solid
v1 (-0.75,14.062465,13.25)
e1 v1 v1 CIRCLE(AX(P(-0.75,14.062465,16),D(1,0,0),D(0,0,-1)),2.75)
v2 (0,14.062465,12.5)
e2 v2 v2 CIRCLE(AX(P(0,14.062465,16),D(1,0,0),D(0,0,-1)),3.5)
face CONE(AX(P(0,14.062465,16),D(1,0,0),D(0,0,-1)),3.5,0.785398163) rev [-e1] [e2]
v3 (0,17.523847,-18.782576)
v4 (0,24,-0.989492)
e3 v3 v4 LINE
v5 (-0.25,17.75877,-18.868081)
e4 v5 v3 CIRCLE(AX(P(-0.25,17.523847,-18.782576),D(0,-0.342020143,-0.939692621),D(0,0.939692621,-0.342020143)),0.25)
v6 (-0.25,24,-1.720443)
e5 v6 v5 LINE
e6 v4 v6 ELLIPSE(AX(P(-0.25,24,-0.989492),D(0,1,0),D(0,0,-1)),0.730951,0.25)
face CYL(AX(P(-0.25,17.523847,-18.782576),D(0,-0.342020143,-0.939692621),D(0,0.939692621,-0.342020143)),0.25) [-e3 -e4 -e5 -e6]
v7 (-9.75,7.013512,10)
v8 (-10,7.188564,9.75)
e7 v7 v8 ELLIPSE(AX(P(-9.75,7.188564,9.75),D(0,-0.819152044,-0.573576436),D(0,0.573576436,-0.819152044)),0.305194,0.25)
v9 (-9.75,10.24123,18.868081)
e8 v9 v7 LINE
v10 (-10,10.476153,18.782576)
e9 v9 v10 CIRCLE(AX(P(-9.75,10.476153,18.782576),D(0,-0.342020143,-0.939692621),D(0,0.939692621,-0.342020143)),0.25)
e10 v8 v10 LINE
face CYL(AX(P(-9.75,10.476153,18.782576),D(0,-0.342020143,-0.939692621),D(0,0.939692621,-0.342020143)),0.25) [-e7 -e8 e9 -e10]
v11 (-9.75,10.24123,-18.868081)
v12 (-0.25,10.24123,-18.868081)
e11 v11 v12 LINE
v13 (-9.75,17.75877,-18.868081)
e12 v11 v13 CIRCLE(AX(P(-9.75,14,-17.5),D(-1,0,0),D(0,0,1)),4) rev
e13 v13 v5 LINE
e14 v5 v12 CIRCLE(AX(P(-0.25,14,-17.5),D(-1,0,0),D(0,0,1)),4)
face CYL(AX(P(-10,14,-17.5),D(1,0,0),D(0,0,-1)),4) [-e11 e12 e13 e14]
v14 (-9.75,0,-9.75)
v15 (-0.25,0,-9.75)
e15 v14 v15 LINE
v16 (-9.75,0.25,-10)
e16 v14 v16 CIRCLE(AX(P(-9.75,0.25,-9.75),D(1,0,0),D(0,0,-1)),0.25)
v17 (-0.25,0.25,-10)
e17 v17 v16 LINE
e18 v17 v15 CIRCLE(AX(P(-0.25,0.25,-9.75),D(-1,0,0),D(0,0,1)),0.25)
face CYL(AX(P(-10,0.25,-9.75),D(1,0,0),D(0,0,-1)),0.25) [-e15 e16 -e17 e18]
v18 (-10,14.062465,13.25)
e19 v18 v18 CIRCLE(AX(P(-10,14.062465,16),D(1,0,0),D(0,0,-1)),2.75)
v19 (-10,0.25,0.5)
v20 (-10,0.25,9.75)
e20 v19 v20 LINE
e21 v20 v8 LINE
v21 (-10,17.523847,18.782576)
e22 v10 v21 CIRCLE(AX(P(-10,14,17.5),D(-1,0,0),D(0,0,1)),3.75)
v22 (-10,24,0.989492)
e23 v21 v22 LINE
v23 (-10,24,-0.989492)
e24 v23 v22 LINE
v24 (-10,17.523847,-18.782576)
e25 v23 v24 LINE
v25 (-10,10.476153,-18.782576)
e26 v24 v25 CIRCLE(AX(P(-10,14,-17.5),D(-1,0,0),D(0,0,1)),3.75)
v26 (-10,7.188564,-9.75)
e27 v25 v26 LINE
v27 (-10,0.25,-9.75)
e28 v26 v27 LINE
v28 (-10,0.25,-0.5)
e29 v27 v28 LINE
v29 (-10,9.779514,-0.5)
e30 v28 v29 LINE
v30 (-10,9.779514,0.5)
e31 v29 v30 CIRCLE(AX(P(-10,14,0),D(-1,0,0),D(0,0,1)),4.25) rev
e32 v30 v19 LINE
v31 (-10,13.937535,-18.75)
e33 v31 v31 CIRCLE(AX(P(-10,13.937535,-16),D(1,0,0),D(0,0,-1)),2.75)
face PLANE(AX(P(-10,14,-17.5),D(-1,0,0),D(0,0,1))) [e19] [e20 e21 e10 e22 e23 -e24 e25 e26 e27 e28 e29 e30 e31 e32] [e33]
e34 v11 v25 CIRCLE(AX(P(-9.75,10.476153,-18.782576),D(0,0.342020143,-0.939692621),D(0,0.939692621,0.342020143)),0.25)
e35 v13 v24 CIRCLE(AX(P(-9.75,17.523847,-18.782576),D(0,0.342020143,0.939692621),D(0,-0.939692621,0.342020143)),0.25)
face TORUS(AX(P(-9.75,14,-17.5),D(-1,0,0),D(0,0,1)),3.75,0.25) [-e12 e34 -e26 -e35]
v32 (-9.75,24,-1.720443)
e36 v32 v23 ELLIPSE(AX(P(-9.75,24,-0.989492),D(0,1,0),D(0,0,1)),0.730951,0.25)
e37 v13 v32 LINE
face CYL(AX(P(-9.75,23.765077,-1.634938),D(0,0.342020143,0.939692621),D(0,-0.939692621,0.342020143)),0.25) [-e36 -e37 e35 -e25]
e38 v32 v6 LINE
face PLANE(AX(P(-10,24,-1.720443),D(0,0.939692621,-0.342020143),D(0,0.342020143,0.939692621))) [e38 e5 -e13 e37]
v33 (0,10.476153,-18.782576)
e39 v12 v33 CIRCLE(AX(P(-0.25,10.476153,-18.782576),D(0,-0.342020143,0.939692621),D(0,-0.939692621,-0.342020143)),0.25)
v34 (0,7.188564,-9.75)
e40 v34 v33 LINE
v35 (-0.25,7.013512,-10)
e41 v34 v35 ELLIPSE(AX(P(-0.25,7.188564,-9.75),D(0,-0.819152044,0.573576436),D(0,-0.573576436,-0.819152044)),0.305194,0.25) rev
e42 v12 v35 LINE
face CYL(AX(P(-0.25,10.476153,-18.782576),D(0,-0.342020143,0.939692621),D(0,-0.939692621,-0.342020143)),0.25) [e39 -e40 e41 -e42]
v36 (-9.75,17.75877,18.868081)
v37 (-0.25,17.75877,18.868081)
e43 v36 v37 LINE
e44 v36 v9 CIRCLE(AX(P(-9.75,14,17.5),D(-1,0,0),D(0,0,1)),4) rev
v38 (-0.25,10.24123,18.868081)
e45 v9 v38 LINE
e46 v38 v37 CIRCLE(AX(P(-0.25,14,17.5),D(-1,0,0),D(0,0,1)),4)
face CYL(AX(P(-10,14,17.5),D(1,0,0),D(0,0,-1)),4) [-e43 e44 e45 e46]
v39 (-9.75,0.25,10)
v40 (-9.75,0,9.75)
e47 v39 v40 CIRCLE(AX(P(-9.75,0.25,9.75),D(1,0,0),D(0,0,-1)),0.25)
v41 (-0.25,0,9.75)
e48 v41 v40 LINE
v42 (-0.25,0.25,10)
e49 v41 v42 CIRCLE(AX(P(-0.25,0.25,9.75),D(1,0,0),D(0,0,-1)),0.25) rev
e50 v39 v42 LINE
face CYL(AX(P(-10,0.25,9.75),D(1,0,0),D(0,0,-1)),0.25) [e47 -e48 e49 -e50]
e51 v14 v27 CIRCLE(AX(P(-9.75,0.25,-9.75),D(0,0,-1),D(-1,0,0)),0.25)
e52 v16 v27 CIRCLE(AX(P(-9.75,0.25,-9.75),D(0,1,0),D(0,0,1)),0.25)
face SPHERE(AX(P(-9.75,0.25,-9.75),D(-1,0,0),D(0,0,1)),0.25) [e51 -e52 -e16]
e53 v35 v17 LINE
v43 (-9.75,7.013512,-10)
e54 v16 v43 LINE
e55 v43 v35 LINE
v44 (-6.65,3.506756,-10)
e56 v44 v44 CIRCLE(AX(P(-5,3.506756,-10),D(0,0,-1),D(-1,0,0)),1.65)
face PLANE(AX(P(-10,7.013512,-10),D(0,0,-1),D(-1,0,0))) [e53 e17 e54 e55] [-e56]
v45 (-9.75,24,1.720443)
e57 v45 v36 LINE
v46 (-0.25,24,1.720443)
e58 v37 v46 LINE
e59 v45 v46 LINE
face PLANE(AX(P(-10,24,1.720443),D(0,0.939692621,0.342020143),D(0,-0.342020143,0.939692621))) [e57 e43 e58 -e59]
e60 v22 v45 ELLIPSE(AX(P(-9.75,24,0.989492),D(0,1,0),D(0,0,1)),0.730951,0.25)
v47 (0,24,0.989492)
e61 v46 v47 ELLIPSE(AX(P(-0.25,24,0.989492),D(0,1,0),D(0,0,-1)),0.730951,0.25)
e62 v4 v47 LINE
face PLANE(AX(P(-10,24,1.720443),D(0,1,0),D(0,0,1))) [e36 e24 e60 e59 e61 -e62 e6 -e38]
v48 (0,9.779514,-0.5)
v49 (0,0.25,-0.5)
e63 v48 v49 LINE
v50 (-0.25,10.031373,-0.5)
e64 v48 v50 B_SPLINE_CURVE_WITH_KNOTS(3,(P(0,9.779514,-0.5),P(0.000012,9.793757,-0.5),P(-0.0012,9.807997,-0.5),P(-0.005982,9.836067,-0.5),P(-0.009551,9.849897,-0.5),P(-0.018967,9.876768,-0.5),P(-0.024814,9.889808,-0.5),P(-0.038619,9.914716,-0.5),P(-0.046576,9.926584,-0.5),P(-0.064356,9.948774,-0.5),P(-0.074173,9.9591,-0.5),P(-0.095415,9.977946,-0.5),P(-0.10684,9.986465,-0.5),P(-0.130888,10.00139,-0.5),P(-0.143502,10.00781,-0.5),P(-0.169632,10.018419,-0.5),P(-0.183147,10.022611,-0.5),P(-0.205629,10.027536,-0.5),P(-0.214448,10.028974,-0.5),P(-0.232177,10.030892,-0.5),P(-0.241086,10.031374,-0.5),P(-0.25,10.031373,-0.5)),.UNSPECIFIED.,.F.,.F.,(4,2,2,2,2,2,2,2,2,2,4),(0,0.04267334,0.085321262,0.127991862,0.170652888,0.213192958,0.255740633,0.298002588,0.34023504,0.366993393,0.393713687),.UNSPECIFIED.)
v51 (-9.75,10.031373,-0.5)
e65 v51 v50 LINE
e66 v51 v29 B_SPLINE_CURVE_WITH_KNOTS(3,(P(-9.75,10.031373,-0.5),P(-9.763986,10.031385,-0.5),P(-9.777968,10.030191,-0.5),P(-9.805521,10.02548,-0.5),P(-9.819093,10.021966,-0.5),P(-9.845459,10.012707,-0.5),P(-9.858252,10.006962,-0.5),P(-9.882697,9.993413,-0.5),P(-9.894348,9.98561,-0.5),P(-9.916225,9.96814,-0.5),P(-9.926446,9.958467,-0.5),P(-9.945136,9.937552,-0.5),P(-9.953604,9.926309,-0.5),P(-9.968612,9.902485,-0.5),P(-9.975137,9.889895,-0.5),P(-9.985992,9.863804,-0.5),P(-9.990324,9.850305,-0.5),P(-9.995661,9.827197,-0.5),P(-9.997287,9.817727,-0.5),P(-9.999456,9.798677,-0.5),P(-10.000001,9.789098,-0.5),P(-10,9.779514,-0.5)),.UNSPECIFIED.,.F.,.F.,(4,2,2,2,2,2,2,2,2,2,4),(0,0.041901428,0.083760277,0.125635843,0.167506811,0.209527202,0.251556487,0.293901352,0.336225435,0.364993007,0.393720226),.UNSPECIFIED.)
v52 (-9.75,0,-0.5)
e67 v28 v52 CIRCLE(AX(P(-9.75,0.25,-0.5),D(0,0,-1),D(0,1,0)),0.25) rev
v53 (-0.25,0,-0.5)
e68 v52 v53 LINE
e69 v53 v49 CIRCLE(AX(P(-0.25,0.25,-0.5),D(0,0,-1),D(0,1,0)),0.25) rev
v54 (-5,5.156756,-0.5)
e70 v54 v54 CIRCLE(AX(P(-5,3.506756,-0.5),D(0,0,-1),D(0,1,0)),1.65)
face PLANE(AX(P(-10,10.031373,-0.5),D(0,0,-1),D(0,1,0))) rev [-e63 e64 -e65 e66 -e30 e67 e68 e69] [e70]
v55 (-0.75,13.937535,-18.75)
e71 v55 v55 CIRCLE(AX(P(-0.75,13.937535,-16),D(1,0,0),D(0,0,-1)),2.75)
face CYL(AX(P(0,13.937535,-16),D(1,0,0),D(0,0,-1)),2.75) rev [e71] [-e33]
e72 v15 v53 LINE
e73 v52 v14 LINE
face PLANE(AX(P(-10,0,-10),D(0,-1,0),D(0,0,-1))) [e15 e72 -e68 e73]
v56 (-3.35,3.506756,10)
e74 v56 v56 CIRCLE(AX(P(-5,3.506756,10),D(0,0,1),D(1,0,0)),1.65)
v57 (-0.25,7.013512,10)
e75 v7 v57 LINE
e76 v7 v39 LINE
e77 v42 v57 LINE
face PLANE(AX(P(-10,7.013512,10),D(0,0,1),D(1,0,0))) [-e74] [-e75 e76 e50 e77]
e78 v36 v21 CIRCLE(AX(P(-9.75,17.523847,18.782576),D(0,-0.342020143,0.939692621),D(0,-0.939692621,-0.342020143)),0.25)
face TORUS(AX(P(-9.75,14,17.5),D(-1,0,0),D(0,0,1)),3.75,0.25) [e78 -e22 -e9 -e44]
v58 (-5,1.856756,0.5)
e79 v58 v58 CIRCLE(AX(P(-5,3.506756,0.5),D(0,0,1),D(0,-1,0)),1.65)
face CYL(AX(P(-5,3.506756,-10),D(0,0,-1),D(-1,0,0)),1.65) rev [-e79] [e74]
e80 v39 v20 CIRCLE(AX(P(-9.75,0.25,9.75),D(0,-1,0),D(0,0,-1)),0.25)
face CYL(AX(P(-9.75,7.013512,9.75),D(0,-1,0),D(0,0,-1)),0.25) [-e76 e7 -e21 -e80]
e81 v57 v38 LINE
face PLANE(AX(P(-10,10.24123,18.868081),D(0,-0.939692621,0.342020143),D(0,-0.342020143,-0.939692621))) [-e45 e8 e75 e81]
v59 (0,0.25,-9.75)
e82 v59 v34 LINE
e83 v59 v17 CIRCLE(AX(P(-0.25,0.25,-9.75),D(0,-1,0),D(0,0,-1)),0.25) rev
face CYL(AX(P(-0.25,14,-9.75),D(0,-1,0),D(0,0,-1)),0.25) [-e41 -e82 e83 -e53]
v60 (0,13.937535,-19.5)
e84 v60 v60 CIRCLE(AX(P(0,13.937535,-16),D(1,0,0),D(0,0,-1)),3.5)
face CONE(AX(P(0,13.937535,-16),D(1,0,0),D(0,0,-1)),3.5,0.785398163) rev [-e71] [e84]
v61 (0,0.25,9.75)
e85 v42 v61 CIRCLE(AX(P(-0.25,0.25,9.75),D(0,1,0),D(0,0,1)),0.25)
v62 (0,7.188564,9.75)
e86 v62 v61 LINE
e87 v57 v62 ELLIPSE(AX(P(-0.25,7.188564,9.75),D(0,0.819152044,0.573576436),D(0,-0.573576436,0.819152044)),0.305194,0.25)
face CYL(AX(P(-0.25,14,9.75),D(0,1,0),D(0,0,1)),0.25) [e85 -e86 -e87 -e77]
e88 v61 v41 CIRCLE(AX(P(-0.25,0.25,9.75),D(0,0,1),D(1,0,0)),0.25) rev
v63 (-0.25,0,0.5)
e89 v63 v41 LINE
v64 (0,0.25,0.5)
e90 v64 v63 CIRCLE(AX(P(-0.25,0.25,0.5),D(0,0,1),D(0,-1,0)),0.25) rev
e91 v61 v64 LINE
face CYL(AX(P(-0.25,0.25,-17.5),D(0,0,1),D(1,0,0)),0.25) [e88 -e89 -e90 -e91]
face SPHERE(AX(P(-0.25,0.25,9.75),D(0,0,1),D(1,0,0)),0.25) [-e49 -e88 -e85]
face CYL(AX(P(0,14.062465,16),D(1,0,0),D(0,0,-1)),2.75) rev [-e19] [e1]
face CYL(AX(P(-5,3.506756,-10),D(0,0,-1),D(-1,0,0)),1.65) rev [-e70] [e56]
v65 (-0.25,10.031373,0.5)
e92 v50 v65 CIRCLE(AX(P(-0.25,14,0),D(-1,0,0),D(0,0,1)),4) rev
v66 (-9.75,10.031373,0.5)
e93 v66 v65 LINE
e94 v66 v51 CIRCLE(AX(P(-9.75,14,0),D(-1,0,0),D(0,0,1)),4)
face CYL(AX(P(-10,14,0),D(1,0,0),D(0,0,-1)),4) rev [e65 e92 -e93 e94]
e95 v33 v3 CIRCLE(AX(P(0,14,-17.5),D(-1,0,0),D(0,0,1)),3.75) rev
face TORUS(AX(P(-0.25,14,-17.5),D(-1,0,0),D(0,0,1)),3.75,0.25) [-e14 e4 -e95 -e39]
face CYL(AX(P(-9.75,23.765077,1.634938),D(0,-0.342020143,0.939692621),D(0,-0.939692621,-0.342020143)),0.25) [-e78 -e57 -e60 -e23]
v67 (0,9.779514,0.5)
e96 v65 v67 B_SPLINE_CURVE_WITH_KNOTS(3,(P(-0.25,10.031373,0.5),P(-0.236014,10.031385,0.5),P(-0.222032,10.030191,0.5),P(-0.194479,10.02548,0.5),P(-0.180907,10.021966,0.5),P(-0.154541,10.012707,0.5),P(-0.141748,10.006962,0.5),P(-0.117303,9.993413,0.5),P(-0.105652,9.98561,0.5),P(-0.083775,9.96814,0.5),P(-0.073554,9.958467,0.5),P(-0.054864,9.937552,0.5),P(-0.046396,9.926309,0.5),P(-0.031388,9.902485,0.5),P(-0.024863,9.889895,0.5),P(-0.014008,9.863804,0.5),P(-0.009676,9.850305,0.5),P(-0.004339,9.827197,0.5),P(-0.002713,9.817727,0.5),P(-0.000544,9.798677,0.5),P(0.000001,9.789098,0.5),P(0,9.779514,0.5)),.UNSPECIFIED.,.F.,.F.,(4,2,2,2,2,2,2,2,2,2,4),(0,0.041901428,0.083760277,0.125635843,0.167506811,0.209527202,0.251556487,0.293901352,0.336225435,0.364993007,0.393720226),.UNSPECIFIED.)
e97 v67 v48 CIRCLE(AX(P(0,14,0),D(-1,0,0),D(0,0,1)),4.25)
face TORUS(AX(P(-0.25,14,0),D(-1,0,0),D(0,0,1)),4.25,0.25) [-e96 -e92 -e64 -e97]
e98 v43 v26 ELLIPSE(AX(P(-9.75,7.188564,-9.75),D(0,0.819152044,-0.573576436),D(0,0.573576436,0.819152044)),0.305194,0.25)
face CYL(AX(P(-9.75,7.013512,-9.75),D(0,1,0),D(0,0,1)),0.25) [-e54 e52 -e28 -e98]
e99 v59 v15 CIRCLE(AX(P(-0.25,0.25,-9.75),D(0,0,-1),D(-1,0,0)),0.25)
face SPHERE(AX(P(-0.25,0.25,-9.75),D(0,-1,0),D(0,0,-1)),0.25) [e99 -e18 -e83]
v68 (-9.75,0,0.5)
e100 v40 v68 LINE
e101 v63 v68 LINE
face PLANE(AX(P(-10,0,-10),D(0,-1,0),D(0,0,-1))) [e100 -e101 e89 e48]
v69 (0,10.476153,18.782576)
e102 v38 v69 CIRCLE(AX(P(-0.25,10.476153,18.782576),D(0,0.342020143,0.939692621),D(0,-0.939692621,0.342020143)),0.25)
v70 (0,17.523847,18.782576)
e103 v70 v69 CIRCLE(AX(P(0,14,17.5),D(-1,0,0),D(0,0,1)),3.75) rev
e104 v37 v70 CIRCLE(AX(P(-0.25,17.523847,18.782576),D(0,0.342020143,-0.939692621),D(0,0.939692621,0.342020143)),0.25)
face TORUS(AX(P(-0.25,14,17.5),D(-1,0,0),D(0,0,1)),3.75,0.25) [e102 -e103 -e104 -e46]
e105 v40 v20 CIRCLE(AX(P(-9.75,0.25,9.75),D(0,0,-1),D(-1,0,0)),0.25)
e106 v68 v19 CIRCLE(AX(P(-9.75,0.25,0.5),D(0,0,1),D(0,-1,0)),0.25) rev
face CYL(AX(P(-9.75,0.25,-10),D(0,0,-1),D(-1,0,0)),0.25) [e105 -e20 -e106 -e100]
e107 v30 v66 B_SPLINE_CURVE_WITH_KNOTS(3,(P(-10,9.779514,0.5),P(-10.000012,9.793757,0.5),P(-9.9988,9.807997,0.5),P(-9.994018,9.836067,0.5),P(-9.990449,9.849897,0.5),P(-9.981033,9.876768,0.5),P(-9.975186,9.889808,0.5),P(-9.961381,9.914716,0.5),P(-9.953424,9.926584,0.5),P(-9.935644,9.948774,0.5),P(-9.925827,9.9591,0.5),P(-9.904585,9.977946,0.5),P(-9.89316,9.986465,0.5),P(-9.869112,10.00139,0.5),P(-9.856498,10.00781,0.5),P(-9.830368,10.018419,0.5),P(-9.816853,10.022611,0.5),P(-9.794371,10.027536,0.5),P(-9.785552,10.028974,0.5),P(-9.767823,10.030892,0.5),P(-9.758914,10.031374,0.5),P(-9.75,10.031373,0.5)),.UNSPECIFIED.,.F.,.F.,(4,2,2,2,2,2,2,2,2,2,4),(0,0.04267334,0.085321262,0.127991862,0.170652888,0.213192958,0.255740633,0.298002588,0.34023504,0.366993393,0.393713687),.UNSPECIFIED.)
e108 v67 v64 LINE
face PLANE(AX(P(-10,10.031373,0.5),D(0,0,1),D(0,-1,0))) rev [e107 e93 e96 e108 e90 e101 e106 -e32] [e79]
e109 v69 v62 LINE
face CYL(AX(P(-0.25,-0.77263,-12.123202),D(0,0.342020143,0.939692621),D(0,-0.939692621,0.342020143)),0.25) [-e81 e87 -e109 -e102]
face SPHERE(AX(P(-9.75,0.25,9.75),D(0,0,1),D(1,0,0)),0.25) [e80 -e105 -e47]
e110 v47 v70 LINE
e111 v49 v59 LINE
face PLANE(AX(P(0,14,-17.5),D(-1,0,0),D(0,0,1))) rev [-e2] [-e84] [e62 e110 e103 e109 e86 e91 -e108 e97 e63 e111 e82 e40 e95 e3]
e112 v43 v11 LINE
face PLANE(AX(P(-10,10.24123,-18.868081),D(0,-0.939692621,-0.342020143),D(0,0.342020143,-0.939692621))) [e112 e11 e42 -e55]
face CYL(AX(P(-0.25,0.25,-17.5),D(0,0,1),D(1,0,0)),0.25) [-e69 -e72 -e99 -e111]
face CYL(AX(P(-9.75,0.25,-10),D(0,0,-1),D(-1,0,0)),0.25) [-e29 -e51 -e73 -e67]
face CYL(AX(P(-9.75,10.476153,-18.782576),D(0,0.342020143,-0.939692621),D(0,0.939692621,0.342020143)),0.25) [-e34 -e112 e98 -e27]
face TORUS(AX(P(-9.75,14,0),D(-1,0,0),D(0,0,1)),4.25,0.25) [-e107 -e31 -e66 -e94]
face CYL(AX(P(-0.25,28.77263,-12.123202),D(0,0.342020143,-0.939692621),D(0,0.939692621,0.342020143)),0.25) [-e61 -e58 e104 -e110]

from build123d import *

# Parameters (mm, degrees)
RESSALTO_EXTRUS_O1_DEPTH                             = 10
CORTE_EXTRUS_O1_DEPTH                                = 10
ESCAREADO_PARA_PARAFUSO_DE_M_QUINA_COM_C_D           = 5.5
ESCAREADO_PARA_PARAFUSO_DE_M_QUINA_COM_C_CSINK_D     = 7
ESCAREADO_PARA_PARAFUSO_DE_M_QUINA_COM_C_CSINK_ANGLE = 90
BROCA_DE_ROSQUEAR_PARA_TARRAXA_DE_M4X0_7_D           = 3.3
FILETE1_R                                            = 0.25
FILETE2_R                                            = 0.25
FILETE3_R                                            = 0.25
FILETE4_R                                            = 0.25
FILETE5_R                                            = 0.25
FILETE6_R                                            = 0.25
FILETE7_R                                            = 0.25


with BuildPart() as part:
    # Esboço1 → Ressalto-extrusão1 (new body)
    with BuildSketch(Plane(origin=(0, 0, 0), x_dir=(0, 0, -1), z_dir=(1, 0, 0))):
        with BuildLine():
            Line((1.720443406, 24), (18.868080573, 17.758770483))
            ThreePointArc((18.868080573, 17.758770483), (21.5, 14), (18.868080573, 10.241229517))
            Line((18.868080573, 10.241229517), (10, 7.013512153))
            Line((10, 7.013512153), (10, 0))
            Line((10, 0), (-10, 0))
            Line((-10, 0), (-10, 7.013512153))
            Line((-10, 7.013512153), (-18.868080573, 10.241229517))
            ThreePointArc((-18.868080573, 10.241229517), (-21.5, 14), (-18.868080573, 17.758770483))
            Line((-18.868080573, 17.758770483), (-1.720443406, 24))
            Line((-1.720443406, 24), (1.720443406, 24))
        make_face()
    extrude(amount=-RESSALTO_EXTRUS_O1_DEPTH)

    # Esboço2 → Corte-extrusão1 (cut)
    with BuildSketch(Plane(origin=(0, 0, 0), x_dir=(0, 0, -1), z_dir=(1, 0, 0))):
        with BuildLine():
            Line((-0.5, 10.031373033), (-0.5, -0.626033642))
            Line((-0.5, -0.626033642), (0.5, -0.626033642))
            Line((0.5, -0.626033642), (0.5, 10.031373033))
            ThreePointArc((0.5, 10.031373033), (0, 18), (-0.5, 10.031373033))
        make_face()
    extrude(amount=-CORTE_EXTRUS_O1_DEPTH, mode=Mode.SUBTRACT)

    # Escareado para parafuso de máquina com cabeça chata de M51 (through all)
    with Locations(Plane(origin=(0, 0, 0), x_dir=(0, 0, -1), z_dir=(1, 0, 0))):
        with Locations((-16, 14.062464808), (16, 13.937535192)):
            CounterSinkHole(ESCAREADO_PARA_PARAFUSO_DE_M_QUINA_COM_C_D / 2, ESCAREADO_PARA_PARAFUSO_DE_M_QUINA_COM_C_CSINK_D / 2, counter_sink_angle=ESCAREADO_PARA_PARAFUSO_DE_M_QUINA_COM_C_CSINK_ANGLE)

    # Broca de rosquear para tarraxa de M4x0.71 (through all)
    with Locations(Plane(origin=(0, 0, -10), x_dir=(-1, 0, 0), z_dir=(0, 0, -1))):
        with Locations((5, 3.506756077)):
            Hole(BROCA_DE_ROSQUEAR_PARA_TARRAXA_DE_M4X0_7_D / 2)

    # Filete1
    filete1_edges = [part.edges().sort_by_distance(p)[0] for p in [
        (0, 20.879385242, -10.29426199),
        (0, 14, -21.5),
        (0, 8.627370835, -14.434040287),
    ]]
    fillet(filete1_edges, radius=FILETE1_R)

    # Filete2
    filete2_edges = [part.edges().sort_by_distance(p)[0] for p in [
        (0, 3.639778298, -10),
    ]]
    fillet(filete2_edges, radius=FILETE2_R)

    # Filete3
    filete3_edges = [part.edges().sort_by_distance(p)[0] for p in [
        (-5.125, 0, -10),
        (0, 0, -5.125),
        (-0.073223305, 0, -9.926776695),
    ]]
    fillet(filete3_edges, radius=FILETE3_R)

    # Filete4
    filete4_edges = [part.edges().sort_by_distance(p)[0] for p in [
        (0, 0, 5.25),
        (-5, 0, 10),
        (-10, 0, 5.25),
    ]]
    fillet(filete4_edges, radius=FILETE4_R)

    # Filete5
    # the kernel refuses this fillet: 0.25 mm, written as the material it takes off along each edge
    with BuildSketch(Plane(origin=(-0.25, 0.25, 9.75), x_dir=(1, 0, 0), z_dir=(0, 0, 1))) as filete5_piece_1_section:
        Polygon((0, 0), (FILETE5_R * 1.02, 0), (FILETE5_R * 1.02, -FILETE5_R * 1.02), (0, -FILETE5_R * 1.02), align=None)
    filete5_piece_1 = extrude(amount=FILETE5_R * 1.02, mode=Mode.PRIVATE)
    filete5_piece_1 = filete5_piece_1 - Plane(origin=(-0.25, 0.25, 9.75), x_dir=(-0.7071067811865475, 0.7071067811865475, 0), z_dir=(0, 0, 1)) * Sphere(FILETE5_R, mode=Mode.PRIVATE)
    add(filete5_piece_1, mode=Mode.SUBTRACT)
    with BuildSketch(Plane(origin=(0, 0.25, 10), x_dir=(-1, 0, 0), z_dir=(0, 1, 0))) as filete5_piece_2_section:
        with BuildLine():
            CenterArc((FILETE5_R, -FILETE5_R), FILETE5_R, 90, 90)
            Line((0, -FILETE5_R), (-FILETE5_R * 0.02, -FILETE5_R))
            Line((-FILETE5_R * 0.02, -FILETE5_R), (-FILETE5_R * 0.02, FILETE5_R * 0.02))
            Line((-FILETE5_R * 0.02, FILETE5_R * 0.02), (FILETE5_R, FILETE5_R * 0.02))
            Line((FILETE5_R, FILETE5_R * 0.02), (FILETE5_R, 0))
        make_face()
    filete5_piece_2 = extrude(amount=8.263512153, mode=Mode.PRIVATE)
    filete5_piece_2 = split(filete5_piece_2, bisect_by=Plane(origin=(-0.056691407, 6.598580187, 8.859983793), z_dir=(0, -0.9396926207859096, 0.3420201433256659)), keep=Keep.TOP, mode=Mode.PRIVATE)
    add(filete5_piece_2, mode=Mode.SUBTRACT)
    with BuildSketch(Plane(origin=(0, 6.500481938, 8.590461069), x_dir=(-1, 0, 0), z_dir=(0, 0.3420201433256658, 0.9396926207859094))) as filete5_piece_3_section:
        with BuildLine():
            CenterArc((FILETE5_R, -FILETE5_R), FILETE5_R, 90, 90)
            Line((0, -FILETE5_R), (-FILETE5_R * 0.02, -FILETE5_R))
            Line((-FILETE5_R * 0.02, -FILETE5_R), (-FILETE5_R * 0.02, FILETE5_R * 0.02))
            Line((-FILETE5_R * 0.02, FILETE5_R * 0.02), (FILETE5_R, FILETE5_R * 0.02))
            Line((FILETE5_R, FILETE5_R * 0.02), (FILETE5_R, 0))
        make_face()
    filete5_piece_3 = extrude(amount=10.937214231, mode=Mode.PRIVATE)
    filete5_piece_3 = split(filete5_piece_3, bisect_by=Plane(origin=(-0.056665107, 8.68396665, 10), z_dir=(0, 0, 1)), keep=Keep.TOP, mode=Mode.PRIVATE)
    add(filete5_piece_3, mode=Mode.SUBTRACT)
    with BuildSketch(Plane(origin=(0, 14, 17.5), x_dir=(0, -0.9396926207859096, 0.3420201433256654), z_dir=(0, -0.3420201433256654, -0.9396926207859096))) as filete5_piece_4:
        with BuildLine():
            CenterArc((4 - FILETE5_R, FILETE5_R), FILETE5_R, 270, 90)
            Line((4 - FILETE5_R, 0), (4 - FILETE5_R, -FILETE5_R * 0.02))
            Line((4 - FILETE5_R, -FILETE5_R * 0.02), (4 + FILETE5_R * 0.02, -FILETE5_R * 0.02))
            Line((4 + FILETE5_R * 0.02, -FILETE5_R * 0.02), (4 + FILETE5_R * 0.02, FILETE5_R))
            Line((4 + FILETE5_R * 0.02, FILETE5_R), (4, FILETE5_R))
        make_face()
    revolve(axis=Axis((0, 14, 17.5), (-1, 0, 0)), revolution_arc=140, mode=Mode.SUBTRACT)
    with BuildSketch(Plane(origin=(0, 17.758770483, 18.868080573), x_dir=(-1, 0, 0), z_dir=(0, 0.342020143325666, -0.9396926207859094))) as filete5_piece_5:
        with BuildLine():
            CenterArc((FILETE5_R, -FILETE5_R), FILETE5_R, 90, 90)
            Line((0, -FILETE5_R), (-FILETE5_R * 0.02, -FILETE5_R))
            Line((-FILETE5_R * 0.02, -FILETE5_R), (-FILETE5_R * 0.02, FILETE5_R * 0.02))
            Line((-FILETE5_R * 0.02, FILETE5_R * 0.02), (FILETE5_R, FILETE5_R * 0.02))
            Line((FILETE5_R, FILETE5_R * 0.02), (FILETE5_R, 0))
        make_face()
    extrude(amount=19.748134324, mode=Mode.SUBTRACT)
    with BuildSketch(Plane(origin=(0, 0.25, 10), x_dir=(-1, 0, 0), z_dir=(0, 1, 0))) as filete5_piece_6a_section:
        with BuildLine():
            CenterArc((FILETE5_R, -FILETE5_R), FILETE5_R, 90, 90)
            Line((0, -FILETE5_R), (-FILETE5_R * 0.02, -FILETE5_R))
            Line((-FILETE5_R * 0.02, -FILETE5_R), (-FILETE5_R * 0.02, FILETE5_R * 0.02))
            Line((-FILETE5_R * 0.02, FILETE5_R * 0.02), (FILETE5_R, FILETE5_R * 0.02))
            Line((FILETE5_R, FILETE5_R * 0.02), (FILETE5_R, 0))
        make_face()
    filete5_piece_6a = extrude(amount=8.263512153, mode=Mode.PRIVATE)
    filete5_piece_6a = split(filete5_piece_6a, bisect_by=Plane(origin=(-0.056188027, 7.08161184, 10.187102353), z_dir=(0, 0.9396926207859096, -0.3420201433256659)), keep=Keep.TOP, mode=Mode.PRIVATE)
    with BuildSketch(Plane(origin=(0, 6.500481938, 8.590461069), x_dir=(-1, 0, 0), z_dir=(0, 0.3420201433256658, 0.9396926207859094))) as filete5_piece_6b_section:
        with BuildLine():
            CenterArc((FILETE5_R, -FILETE5_R), FILETE5_R, 90, 90)
            Line((0, -FILETE5_R), (-FILETE5_R * 0.02, -FILETE5_R))
            Line((-FILETE5_R * 0.02, -FILETE5_R), (-FILETE5_R * 0.02, FILETE5_R * 0.02))
            Line((-FILETE5_R * 0.02, FILETE5_R * 0.02), (FILETE5_R, FILETE5_R * 0.02))
            Line((FILETE5_R, FILETE5_R * 0.02), (FILETE5_R, 0))
        make_face()
    filete5_piece_6b = extrude(amount=10.937214231, mode=Mode.PRIVATE)
    filete5_piece_6b = split(filete5_piece_6b, bisect_by=Plane(origin=(-0.056188027, 6.814401988, 10), z_dir=(0, 0, -1)), keep=Keep.TOP, mode=Mode.PRIVATE)
    filete5_piece_6 = filete5_piece_6a & filete5_piece_6b
    add(filete5_piece_6, mode=Mode.SUBTRACT)

    # Filete6
    # the kernel refuses this fillet: 0.25 mm, written as the material it takes off along each edge
    with BuildSketch(Plane(origin=(-9.75, 0.25, 9.75), x_dir=(0, 0, 1), z_dir=(-1, 0, 0))) as filete6_piece_1_section:
        Polygon((0, 0), (FILETE6_R * 1.02, 0), (FILETE6_R * 1.02, -FILETE6_R * 1.02), (0, -FILETE6_R * 1.02), align=None)
    filete6_piece_1 = extrude(amount=FILETE6_R * 1.02, mode=Mode.PRIVATE)
    filete6_piece_1 = filete6_piece_1 - Plane(origin=(-9.75, 0.25, 9.75), x_dir=(0, 0.7071067811865475, -0.7071067811865475), z_dir=(-1, 0, 0)) * Sphere(FILETE6_R, mode=Mode.PRIVATE)
    add(filete6_piece_1, mode=Mode.SUBTRACT)
    with BuildSketch(Plane(origin=(-10, 17.758770483, 18.868080573), x_dir=(0, -0.9396926207859094, -0.34202014332566594), z_dir=(0, 0.342020143325666, -0.9396926207859094)), Plane(origin=(-10, 24.513030215, -0.310904475), x_dir=(0, -0.9396926207859094, 0.342020143325666), z_dir=(0, -0.342020143325666, -0.9396926207859094))) as filete6_piece_2:
        with BuildLine():
            CenterArc((FILETE6_R, -FILETE6_R), FILETE6_R, 90, 90)
            Line((0, -FILETE6_R), (-FILETE6_R * 0.02, -FILETE6_R))
            Line((-FILETE6_R * 0.02, -FILETE6_R), (-FILETE6_R * 0.02, FILETE6_R * 0.02))
            Line((-FILETE6_R * 0.02, FILETE6_R * 0.02), (FILETE6_R, FILETE6_R * 0.02))
            Line((FILETE6_R, FILETE6_R * 0.02), (FILETE6_R, 0))
        make_face()
    extrude(amount=19.748134324, mode=Mode.SUBTRACT)
    with BuildSketch(Plane(origin=(-10, 14, 17.5), x_dir=(0, -0.9396926207859096, 0.3420201433256654), z_dir=(0, -0.3420201433256654, -0.9396926207859096))) as filete6_piece_3:
        with BuildLine():
            CenterArc((4 - FILETE6_R, -FILETE6_R), FILETE6_R, 0, 90)
            Line((4, -FILETE6_R), (4 + FILETE6_R * 0.02, -FILETE6_R))
            Line((4 + FILETE6_R * 0.02, -FILETE6_R), (4 + FILETE6_R * 0.02, FILETE6_R * 0.02))
            Line((4 + FILETE6_R * 0.02, FILETE6_R * 0.02), (4 - FILETE6_R, FILETE6_R * 0.02))
            Line((4 - FILETE6_R, FILETE6_R * 0.02), (4 - FILETE6_R, 0))
        make_face()
    revolve(axis=Axis((-10, 14, 17.5), (-1, 0, 0)), revolution_arc=140, mode=Mode.SUBTRACT)
    with BuildSketch(Plane(origin=(-10, 6.500481938, 8.590461069), x_dir=(0, 0.9396926207859094, -0.3420201433256658), z_dir=(0, 0.3420201433256658, 0.9396926207859094))) as filete6_piece_4_section:
        with BuildLine():
            CenterArc((FILETE6_R, -FILETE6_R), FILETE6_R, 90, 90)
            Line((0, -FILETE6_R), (-FILETE6_R * 0.02, -FILETE6_R))
            Line((-FILETE6_R * 0.02, -FILETE6_R), (-FILETE6_R * 0.02, FILETE6_R * 0.02))
            Line((-FILETE6_R * 0.02, FILETE6_R * 0.02), (FILETE6_R, FILETE6_R * 0.02))
            Line((FILETE6_R, FILETE6_R * 0.02), (FILETE6_R, 0))
        make_face()
    filete6_piece_4 = extrude(amount=10.937214231, mode=Mode.PRIVATE)
    filete6_piece_4 = split(filete6_piece_4, bisect_by=Plane(origin=(-9.943334893, 8.68396665, 10), z_dir=(0, 0, 1)), keep=Keep.TOP, mode=Mode.PRIVATE)
    add(filete6_piece_4, mode=Mode.SUBTRACT)
    with BuildSketch(Plane(origin=(-10, 0.25, 10), x_dir=(0, 0, -1), z_dir=(0, 1, 0))) as filete6_piece_5_section:
        with BuildLine():
            CenterArc((FILETE6_R, -FILETE6_R), FILETE6_R, 90, 90)
            Line((0, -FILETE6_R), (-FILETE6_R * 0.02, -FILETE6_R))
            Line((-FILETE6_R * 0.02, -FILETE6_R), (-FILETE6_R * 0.02, FILETE6_R * 0.02))
            Line((-FILETE6_R * 0.02, FILETE6_R * 0.02), (FILETE6_R, FILETE6_R * 0.02))
            Line((FILETE6_R, FILETE6_R * 0.02), (FILETE6_R, 0))
        make_face()
    filete6_piece_5 = extrude(amount=8.263512153, mode=Mode.PRIVATE)
    filete6_piece_5 = split(filete6_piece_5, bisect_by=Plane(origin=(-9.943308593, 6.598580187, 8.859983793), z_dir=(0, -0.9396926207859096, 0.3420201433256659)), keep=Keep.TOP, mode=Mode.PRIVATE)
    add(filete6_piece_5, mode=Mode.SUBTRACT)
    with BuildSketch(Plane(origin=(-10, 0, -9.75), x_dir=(0, 1, 0), z_dir=(0, 0, 1))) as filete6_piece_6:
        with BuildLine():
            CenterArc((FILETE6_R, -FILETE6_R), FILETE6_R, 90, 90)
            Line((0, -FILETE6_R), (-FILETE6_R * 0.02, -FILETE6_R))
            Line((-FILETE6_R * 0.02, -FILETE6_R), (-FILETE6_R * 0.02, FILETE6_R * 0.02))
            Line((-FILETE6_R * 0.02, FILETE6_R * 0.02), (FILETE6_R, FILETE6_R * 0.02))
            Line((FILETE6_R, FILETE6_R * 0.02), (FILETE6_R, 0))
        make_face()
    extrude(amount=10.75, mode=Mode.SUBTRACT)
    with BuildSketch(Plane(origin=(-10, 10.241229517, -18.868080573), x_dir=(0, 0.9396926207859094, 0.34202014332566577), z_dir=(0, -0.3420201433256658, 0.9396926207859094))) as filete6_piece_7_section:
        with BuildLine():
            CenterArc((FILETE6_R, -FILETE6_R), FILETE6_R, 90, 90)
            Line((0, -FILETE6_R), (-FILETE6_R * 0.02, -FILETE6_R))
            Line((-FILETE6_R * 0.02, -FILETE6_R), (-FILETE6_R * 0.02, FILETE6_R * 0.02))
            Line((-FILETE6_R * 0.02, FILETE6_R * 0.02), (FILETE6_R, FILETE6_R * 0.02))
            Line((FILETE6_R, FILETE6_R * 0.02), (FILETE6_R, 0))
        make_face()
    filete6_piece_7 = extrude(amount=10.937214231, mode=Mode.PRIVATE)
    filete6_piece_7 = split(filete6_piece_7, bisect_by=Plane(origin=(-9.943334893, 8.68396665, -10), z_dir=(0, 0, -1)), keep=Keep.TOP, mode=Mode.PRIVATE)
    add(filete6_piece_7, mode=Mode.SUBTRACT)
    with BuildSketch(Plane(origin=(-10, 14, -17.5), x_dir=(0, 0.9396926207859096, -0.3420201433256654), z_dir=(0, 0.3420201433256654, 0.9396926207859096))) as filete6_piece_8:
        with BuildLine():
            CenterArc((4 - FILETE6_R, -FILETE6_R), FILETE6_R, 0, 90)
            Line((4, -FILETE6_R), (4 + FILETE6_R * 0.02, -FILETE6_R))
            Line((4 + FILETE6_R * 0.02, -FILETE6_R), (4 + FILETE6_R * 0.02, FILETE6_R * 0.02))
            Line((4 + FILETE6_R * 0.02, FILETE6_R * 0.02), (4 - FILETE6_R, FILETE6_R * 0.02))
            Line((4 - FILETE6_R, FILETE6_R * 0.02), (4 - FILETE6_R, 0))
        make_face()
    revolve(axis=Axis((-10, 14, -17.5), (-1, 0, 0)), revolution_arc=140, mode=Mode.SUBTRACT)
    with BuildSketch(Plane(origin=(-10, 8.513512153, -10), x_dir=(0, 0, 1), z_dir=(0, -1, 0))) as filete6_piece_9_section:
        with BuildLine():
            CenterArc((FILETE6_R, -FILETE6_R), FILETE6_R, 90, 90)
            Line((0, -FILETE6_R), (-FILETE6_R * 0.02, -FILETE6_R))
            Line((-FILETE6_R * 0.02, -FILETE6_R), (-FILETE6_R * 0.02, FILETE6_R * 0.02))
            Line((-FILETE6_R * 0.02, FILETE6_R * 0.02), (FILETE6_R, FILETE6_R * 0.02))
            Line((FILETE6_R, FILETE6_R * 0.02), (FILETE6_R, 0))
        make_face()
    filete6_piece_9 = extrude(amount=8.263512153, mode=Mode.PRIVATE)
    filete6_piece_9 = split(filete6_piece_9, bisect_by=Plane(origin=(-9.943308593, 6.598580187, -8.859983793), z_dir=(0, -0.9396926207859096, -0.3420201433256659)), keep=Keep.TOP, mode=Mode.PRIVATE)
    add(filete6_piece_9, mode=Mode.SUBTRACT)
    with BuildSketch(Plane(origin=(-10, 0.25, -9.75), x_dir=(0, 0, -1), z_dir=(0, 1, 0))) as filete6_piece_10:
        with BuildLine():
            CenterArc((0.25 - FILETE6_R, -FILETE6_R), FILETE6_R, 0, 90)
            Line((0.25, -FILETE6_R), (0.25 + FILETE6_R * 0.02, -FILETE6_R))
            Line((0.25 + FILETE6_R * 0.02, -FILETE6_R), (0.25 + FILETE6_R * 0.02, 0))
            Line((0.25 + FILETE6_R * 0.02, 0), (0.25, FILETE6_R * 0.02))
            Line((0.25, FILETE6_R * 0.02), (0.25 - FILETE6_R, FILETE6_R * 0.02))
            Line((0.25 - FILETE6_R, FILETE6_R * 0.02), (0.25 - FILETE6_R, 0))
        make_face()
    revolve(axis=Axis((-10, 0.25, -9.75), (-1, 0, 0)), revolution_arc=90, mode=Mode.SUBTRACT)
    with BuildSketch(Plane(origin=(-10, 0.25, 10), x_dir=(0, 0, -1), z_dir=(0, 1, 0))) as filete6_piece_11a_section:
        with BuildLine():
            CenterArc((FILETE6_R, -FILETE6_R), FILETE6_R, 90, 90)
            Line((0, -FILETE6_R), (-FILETE6_R * 0.02, -FILETE6_R))
            Line((-FILETE6_R * 0.02, -FILETE6_R), (-FILETE6_R * 0.02, FILETE6_R * 0.02))
            Line((-FILETE6_R * 0.02, FILETE6_R * 0.02), (FILETE6_R, FILETE6_R * 0.02))
            Line((FILETE6_R, FILETE6_R * 0.02), (FILETE6_R, 0))
        make_face()
    filete6_piece_11a = extrude(amount=8.263512153, mode=Mode.PRIVATE)
    filete6_piece_11a = split(filete6_piece_11a, bisect_by=Plane(origin=(-9.943811973, 7.08161184, 10.187102353), z_dir=(0, 0.9396926207859096, -0.3420201433256659)), keep=Keep.TOP, mode=Mode.PRIVATE)
    with BuildSketch(Plane(origin=(-10, 6.500481938, 8.590461069), x_dir=(0, 0.9396926207859094, -0.3420201433256658), z_dir=(0, 0.3420201433256658, 0.9396926207859094))) as filete6_piece_11b_section:
        with BuildLine():
            CenterArc((FILETE6_R, -FILETE6_R), FILETE6_R, 90, 90)
            Line((0, -FILETE6_R), (-FILETE6_R * 0.02, -FILETE6_R))
            Line((-FILETE6_R * 0.02, -FILETE6_R), (-FILETE6_R * 0.02, FILETE6_R * 0.02))
            Line((-FILETE6_R * 0.02, FILETE6_R * 0.02), (FILETE6_R, FILETE6_R * 0.02))
            Line((FILETE6_R, FILETE6_R * 0.02), (FILETE6_R, 0))
        make_face()
    filete6_piece_11b = extrude(amount=10.937214231, mode=Mode.PRIVATE)
    filete6_piece_11b = split(filete6_piece_11b, bisect_by=Plane(origin=(-9.943811973, 6.814401988, 10), z_dir=(0, 0, -1)), keep=Keep.TOP, mode=Mode.PRIVATE)
    filete6_piece_11 = filete6_piece_11a & filete6_piece_11b
    add(filete6_piece_11, mode=Mode.SUBTRACT)
    with BuildSketch(Plane(origin=(-10, 8.513512153, -10), x_dir=(0, 0, 1), z_dir=(0, -1, 0))) as filete6_piece_12a_section:
        with BuildLine():
            CenterArc((FILETE6_R, -FILETE6_R), FILETE6_R, 90, 90)
            Line((0, -FILETE6_R), (-FILETE6_R * 0.02, -FILETE6_R))
            Line((-FILETE6_R * 0.02, -FILETE6_R), (-FILETE6_R * 0.02, FILETE6_R * 0.02))
            Line((-FILETE6_R * 0.02, FILETE6_R * 0.02), (FILETE6_R, FILETE6_R * 0.02))
            Line((FILETE6_R, FILETE6_R * 0.02), (FILETE6_R, 0))
        make_face()
    filete6_piece_12a = extrude(amount=8.263512153, mode=Mode.PRIVATE)
    filete6_piece_12a = split(filete6_piece_12a, bisect_by=Plane(origin=(-9.943811973, 7.08161184, -10.187102353), z_dir=(0, 0.9396926207859096, 0.3420201433256659)), keep=Keep.TOP, mode=Mode.PRIVATE)
    with BuildSketch(Plane(origin=(-10, 10.241229517, -18.868080573), x_dir=(0, 0.9396926207859094, 0.34202014332566577), z_dir=(0, -0.3420201433256658, 0.9396926207859094))) as filete6_piece_12b_section:
        with BuildLine():
            CenterArc((FILETE6_R, -FILETE6_R), FILETE6_R, 90, 90)
            Line((0, -FILETE6_R), (-FILETE6_R * 0.02, -FILETE6_R))
            Line((-FILETE6_R * 0.02, -FILETE6_R), (-FILETE6_R * 0.02, FILETE6_R * 0.02))
            Line((-FILETE6_R * 0.02, FILETE6_R * 0.02), (FILETE6_R, FILETE6_R * 0.02))
            Line((FILETE6_R, FILETE6_R * 0.02), (FILETE6_R, 0))
        make_face()
    filete6_piece_12b = extrude(amount=10.937214231, mode=Mode.PRIVATE)
    filete6_piece_12b = split(filete6_piece_12b, bisect_by=Plane(origin=(-9.943811973, 6.814401988, -10), z_dir=(0, 0, 1)), keep=Keep.TOP, mode=Mode.PRIVATE)
    filete6_piece_12 = filete6_piece_12a & filete6_piece_12b
    add(filete6_piece_12, mode=Mode.SUBTRACT)

    # Filete7
    filete7_edges = [part.edges().sort_by_distance(p)[0] for p in [
        (-10, 18, 0),
        (0, 18, 0),
    ]]
    fillet(filete7_edges, radius=FILETE7_R)


solid = part.part
